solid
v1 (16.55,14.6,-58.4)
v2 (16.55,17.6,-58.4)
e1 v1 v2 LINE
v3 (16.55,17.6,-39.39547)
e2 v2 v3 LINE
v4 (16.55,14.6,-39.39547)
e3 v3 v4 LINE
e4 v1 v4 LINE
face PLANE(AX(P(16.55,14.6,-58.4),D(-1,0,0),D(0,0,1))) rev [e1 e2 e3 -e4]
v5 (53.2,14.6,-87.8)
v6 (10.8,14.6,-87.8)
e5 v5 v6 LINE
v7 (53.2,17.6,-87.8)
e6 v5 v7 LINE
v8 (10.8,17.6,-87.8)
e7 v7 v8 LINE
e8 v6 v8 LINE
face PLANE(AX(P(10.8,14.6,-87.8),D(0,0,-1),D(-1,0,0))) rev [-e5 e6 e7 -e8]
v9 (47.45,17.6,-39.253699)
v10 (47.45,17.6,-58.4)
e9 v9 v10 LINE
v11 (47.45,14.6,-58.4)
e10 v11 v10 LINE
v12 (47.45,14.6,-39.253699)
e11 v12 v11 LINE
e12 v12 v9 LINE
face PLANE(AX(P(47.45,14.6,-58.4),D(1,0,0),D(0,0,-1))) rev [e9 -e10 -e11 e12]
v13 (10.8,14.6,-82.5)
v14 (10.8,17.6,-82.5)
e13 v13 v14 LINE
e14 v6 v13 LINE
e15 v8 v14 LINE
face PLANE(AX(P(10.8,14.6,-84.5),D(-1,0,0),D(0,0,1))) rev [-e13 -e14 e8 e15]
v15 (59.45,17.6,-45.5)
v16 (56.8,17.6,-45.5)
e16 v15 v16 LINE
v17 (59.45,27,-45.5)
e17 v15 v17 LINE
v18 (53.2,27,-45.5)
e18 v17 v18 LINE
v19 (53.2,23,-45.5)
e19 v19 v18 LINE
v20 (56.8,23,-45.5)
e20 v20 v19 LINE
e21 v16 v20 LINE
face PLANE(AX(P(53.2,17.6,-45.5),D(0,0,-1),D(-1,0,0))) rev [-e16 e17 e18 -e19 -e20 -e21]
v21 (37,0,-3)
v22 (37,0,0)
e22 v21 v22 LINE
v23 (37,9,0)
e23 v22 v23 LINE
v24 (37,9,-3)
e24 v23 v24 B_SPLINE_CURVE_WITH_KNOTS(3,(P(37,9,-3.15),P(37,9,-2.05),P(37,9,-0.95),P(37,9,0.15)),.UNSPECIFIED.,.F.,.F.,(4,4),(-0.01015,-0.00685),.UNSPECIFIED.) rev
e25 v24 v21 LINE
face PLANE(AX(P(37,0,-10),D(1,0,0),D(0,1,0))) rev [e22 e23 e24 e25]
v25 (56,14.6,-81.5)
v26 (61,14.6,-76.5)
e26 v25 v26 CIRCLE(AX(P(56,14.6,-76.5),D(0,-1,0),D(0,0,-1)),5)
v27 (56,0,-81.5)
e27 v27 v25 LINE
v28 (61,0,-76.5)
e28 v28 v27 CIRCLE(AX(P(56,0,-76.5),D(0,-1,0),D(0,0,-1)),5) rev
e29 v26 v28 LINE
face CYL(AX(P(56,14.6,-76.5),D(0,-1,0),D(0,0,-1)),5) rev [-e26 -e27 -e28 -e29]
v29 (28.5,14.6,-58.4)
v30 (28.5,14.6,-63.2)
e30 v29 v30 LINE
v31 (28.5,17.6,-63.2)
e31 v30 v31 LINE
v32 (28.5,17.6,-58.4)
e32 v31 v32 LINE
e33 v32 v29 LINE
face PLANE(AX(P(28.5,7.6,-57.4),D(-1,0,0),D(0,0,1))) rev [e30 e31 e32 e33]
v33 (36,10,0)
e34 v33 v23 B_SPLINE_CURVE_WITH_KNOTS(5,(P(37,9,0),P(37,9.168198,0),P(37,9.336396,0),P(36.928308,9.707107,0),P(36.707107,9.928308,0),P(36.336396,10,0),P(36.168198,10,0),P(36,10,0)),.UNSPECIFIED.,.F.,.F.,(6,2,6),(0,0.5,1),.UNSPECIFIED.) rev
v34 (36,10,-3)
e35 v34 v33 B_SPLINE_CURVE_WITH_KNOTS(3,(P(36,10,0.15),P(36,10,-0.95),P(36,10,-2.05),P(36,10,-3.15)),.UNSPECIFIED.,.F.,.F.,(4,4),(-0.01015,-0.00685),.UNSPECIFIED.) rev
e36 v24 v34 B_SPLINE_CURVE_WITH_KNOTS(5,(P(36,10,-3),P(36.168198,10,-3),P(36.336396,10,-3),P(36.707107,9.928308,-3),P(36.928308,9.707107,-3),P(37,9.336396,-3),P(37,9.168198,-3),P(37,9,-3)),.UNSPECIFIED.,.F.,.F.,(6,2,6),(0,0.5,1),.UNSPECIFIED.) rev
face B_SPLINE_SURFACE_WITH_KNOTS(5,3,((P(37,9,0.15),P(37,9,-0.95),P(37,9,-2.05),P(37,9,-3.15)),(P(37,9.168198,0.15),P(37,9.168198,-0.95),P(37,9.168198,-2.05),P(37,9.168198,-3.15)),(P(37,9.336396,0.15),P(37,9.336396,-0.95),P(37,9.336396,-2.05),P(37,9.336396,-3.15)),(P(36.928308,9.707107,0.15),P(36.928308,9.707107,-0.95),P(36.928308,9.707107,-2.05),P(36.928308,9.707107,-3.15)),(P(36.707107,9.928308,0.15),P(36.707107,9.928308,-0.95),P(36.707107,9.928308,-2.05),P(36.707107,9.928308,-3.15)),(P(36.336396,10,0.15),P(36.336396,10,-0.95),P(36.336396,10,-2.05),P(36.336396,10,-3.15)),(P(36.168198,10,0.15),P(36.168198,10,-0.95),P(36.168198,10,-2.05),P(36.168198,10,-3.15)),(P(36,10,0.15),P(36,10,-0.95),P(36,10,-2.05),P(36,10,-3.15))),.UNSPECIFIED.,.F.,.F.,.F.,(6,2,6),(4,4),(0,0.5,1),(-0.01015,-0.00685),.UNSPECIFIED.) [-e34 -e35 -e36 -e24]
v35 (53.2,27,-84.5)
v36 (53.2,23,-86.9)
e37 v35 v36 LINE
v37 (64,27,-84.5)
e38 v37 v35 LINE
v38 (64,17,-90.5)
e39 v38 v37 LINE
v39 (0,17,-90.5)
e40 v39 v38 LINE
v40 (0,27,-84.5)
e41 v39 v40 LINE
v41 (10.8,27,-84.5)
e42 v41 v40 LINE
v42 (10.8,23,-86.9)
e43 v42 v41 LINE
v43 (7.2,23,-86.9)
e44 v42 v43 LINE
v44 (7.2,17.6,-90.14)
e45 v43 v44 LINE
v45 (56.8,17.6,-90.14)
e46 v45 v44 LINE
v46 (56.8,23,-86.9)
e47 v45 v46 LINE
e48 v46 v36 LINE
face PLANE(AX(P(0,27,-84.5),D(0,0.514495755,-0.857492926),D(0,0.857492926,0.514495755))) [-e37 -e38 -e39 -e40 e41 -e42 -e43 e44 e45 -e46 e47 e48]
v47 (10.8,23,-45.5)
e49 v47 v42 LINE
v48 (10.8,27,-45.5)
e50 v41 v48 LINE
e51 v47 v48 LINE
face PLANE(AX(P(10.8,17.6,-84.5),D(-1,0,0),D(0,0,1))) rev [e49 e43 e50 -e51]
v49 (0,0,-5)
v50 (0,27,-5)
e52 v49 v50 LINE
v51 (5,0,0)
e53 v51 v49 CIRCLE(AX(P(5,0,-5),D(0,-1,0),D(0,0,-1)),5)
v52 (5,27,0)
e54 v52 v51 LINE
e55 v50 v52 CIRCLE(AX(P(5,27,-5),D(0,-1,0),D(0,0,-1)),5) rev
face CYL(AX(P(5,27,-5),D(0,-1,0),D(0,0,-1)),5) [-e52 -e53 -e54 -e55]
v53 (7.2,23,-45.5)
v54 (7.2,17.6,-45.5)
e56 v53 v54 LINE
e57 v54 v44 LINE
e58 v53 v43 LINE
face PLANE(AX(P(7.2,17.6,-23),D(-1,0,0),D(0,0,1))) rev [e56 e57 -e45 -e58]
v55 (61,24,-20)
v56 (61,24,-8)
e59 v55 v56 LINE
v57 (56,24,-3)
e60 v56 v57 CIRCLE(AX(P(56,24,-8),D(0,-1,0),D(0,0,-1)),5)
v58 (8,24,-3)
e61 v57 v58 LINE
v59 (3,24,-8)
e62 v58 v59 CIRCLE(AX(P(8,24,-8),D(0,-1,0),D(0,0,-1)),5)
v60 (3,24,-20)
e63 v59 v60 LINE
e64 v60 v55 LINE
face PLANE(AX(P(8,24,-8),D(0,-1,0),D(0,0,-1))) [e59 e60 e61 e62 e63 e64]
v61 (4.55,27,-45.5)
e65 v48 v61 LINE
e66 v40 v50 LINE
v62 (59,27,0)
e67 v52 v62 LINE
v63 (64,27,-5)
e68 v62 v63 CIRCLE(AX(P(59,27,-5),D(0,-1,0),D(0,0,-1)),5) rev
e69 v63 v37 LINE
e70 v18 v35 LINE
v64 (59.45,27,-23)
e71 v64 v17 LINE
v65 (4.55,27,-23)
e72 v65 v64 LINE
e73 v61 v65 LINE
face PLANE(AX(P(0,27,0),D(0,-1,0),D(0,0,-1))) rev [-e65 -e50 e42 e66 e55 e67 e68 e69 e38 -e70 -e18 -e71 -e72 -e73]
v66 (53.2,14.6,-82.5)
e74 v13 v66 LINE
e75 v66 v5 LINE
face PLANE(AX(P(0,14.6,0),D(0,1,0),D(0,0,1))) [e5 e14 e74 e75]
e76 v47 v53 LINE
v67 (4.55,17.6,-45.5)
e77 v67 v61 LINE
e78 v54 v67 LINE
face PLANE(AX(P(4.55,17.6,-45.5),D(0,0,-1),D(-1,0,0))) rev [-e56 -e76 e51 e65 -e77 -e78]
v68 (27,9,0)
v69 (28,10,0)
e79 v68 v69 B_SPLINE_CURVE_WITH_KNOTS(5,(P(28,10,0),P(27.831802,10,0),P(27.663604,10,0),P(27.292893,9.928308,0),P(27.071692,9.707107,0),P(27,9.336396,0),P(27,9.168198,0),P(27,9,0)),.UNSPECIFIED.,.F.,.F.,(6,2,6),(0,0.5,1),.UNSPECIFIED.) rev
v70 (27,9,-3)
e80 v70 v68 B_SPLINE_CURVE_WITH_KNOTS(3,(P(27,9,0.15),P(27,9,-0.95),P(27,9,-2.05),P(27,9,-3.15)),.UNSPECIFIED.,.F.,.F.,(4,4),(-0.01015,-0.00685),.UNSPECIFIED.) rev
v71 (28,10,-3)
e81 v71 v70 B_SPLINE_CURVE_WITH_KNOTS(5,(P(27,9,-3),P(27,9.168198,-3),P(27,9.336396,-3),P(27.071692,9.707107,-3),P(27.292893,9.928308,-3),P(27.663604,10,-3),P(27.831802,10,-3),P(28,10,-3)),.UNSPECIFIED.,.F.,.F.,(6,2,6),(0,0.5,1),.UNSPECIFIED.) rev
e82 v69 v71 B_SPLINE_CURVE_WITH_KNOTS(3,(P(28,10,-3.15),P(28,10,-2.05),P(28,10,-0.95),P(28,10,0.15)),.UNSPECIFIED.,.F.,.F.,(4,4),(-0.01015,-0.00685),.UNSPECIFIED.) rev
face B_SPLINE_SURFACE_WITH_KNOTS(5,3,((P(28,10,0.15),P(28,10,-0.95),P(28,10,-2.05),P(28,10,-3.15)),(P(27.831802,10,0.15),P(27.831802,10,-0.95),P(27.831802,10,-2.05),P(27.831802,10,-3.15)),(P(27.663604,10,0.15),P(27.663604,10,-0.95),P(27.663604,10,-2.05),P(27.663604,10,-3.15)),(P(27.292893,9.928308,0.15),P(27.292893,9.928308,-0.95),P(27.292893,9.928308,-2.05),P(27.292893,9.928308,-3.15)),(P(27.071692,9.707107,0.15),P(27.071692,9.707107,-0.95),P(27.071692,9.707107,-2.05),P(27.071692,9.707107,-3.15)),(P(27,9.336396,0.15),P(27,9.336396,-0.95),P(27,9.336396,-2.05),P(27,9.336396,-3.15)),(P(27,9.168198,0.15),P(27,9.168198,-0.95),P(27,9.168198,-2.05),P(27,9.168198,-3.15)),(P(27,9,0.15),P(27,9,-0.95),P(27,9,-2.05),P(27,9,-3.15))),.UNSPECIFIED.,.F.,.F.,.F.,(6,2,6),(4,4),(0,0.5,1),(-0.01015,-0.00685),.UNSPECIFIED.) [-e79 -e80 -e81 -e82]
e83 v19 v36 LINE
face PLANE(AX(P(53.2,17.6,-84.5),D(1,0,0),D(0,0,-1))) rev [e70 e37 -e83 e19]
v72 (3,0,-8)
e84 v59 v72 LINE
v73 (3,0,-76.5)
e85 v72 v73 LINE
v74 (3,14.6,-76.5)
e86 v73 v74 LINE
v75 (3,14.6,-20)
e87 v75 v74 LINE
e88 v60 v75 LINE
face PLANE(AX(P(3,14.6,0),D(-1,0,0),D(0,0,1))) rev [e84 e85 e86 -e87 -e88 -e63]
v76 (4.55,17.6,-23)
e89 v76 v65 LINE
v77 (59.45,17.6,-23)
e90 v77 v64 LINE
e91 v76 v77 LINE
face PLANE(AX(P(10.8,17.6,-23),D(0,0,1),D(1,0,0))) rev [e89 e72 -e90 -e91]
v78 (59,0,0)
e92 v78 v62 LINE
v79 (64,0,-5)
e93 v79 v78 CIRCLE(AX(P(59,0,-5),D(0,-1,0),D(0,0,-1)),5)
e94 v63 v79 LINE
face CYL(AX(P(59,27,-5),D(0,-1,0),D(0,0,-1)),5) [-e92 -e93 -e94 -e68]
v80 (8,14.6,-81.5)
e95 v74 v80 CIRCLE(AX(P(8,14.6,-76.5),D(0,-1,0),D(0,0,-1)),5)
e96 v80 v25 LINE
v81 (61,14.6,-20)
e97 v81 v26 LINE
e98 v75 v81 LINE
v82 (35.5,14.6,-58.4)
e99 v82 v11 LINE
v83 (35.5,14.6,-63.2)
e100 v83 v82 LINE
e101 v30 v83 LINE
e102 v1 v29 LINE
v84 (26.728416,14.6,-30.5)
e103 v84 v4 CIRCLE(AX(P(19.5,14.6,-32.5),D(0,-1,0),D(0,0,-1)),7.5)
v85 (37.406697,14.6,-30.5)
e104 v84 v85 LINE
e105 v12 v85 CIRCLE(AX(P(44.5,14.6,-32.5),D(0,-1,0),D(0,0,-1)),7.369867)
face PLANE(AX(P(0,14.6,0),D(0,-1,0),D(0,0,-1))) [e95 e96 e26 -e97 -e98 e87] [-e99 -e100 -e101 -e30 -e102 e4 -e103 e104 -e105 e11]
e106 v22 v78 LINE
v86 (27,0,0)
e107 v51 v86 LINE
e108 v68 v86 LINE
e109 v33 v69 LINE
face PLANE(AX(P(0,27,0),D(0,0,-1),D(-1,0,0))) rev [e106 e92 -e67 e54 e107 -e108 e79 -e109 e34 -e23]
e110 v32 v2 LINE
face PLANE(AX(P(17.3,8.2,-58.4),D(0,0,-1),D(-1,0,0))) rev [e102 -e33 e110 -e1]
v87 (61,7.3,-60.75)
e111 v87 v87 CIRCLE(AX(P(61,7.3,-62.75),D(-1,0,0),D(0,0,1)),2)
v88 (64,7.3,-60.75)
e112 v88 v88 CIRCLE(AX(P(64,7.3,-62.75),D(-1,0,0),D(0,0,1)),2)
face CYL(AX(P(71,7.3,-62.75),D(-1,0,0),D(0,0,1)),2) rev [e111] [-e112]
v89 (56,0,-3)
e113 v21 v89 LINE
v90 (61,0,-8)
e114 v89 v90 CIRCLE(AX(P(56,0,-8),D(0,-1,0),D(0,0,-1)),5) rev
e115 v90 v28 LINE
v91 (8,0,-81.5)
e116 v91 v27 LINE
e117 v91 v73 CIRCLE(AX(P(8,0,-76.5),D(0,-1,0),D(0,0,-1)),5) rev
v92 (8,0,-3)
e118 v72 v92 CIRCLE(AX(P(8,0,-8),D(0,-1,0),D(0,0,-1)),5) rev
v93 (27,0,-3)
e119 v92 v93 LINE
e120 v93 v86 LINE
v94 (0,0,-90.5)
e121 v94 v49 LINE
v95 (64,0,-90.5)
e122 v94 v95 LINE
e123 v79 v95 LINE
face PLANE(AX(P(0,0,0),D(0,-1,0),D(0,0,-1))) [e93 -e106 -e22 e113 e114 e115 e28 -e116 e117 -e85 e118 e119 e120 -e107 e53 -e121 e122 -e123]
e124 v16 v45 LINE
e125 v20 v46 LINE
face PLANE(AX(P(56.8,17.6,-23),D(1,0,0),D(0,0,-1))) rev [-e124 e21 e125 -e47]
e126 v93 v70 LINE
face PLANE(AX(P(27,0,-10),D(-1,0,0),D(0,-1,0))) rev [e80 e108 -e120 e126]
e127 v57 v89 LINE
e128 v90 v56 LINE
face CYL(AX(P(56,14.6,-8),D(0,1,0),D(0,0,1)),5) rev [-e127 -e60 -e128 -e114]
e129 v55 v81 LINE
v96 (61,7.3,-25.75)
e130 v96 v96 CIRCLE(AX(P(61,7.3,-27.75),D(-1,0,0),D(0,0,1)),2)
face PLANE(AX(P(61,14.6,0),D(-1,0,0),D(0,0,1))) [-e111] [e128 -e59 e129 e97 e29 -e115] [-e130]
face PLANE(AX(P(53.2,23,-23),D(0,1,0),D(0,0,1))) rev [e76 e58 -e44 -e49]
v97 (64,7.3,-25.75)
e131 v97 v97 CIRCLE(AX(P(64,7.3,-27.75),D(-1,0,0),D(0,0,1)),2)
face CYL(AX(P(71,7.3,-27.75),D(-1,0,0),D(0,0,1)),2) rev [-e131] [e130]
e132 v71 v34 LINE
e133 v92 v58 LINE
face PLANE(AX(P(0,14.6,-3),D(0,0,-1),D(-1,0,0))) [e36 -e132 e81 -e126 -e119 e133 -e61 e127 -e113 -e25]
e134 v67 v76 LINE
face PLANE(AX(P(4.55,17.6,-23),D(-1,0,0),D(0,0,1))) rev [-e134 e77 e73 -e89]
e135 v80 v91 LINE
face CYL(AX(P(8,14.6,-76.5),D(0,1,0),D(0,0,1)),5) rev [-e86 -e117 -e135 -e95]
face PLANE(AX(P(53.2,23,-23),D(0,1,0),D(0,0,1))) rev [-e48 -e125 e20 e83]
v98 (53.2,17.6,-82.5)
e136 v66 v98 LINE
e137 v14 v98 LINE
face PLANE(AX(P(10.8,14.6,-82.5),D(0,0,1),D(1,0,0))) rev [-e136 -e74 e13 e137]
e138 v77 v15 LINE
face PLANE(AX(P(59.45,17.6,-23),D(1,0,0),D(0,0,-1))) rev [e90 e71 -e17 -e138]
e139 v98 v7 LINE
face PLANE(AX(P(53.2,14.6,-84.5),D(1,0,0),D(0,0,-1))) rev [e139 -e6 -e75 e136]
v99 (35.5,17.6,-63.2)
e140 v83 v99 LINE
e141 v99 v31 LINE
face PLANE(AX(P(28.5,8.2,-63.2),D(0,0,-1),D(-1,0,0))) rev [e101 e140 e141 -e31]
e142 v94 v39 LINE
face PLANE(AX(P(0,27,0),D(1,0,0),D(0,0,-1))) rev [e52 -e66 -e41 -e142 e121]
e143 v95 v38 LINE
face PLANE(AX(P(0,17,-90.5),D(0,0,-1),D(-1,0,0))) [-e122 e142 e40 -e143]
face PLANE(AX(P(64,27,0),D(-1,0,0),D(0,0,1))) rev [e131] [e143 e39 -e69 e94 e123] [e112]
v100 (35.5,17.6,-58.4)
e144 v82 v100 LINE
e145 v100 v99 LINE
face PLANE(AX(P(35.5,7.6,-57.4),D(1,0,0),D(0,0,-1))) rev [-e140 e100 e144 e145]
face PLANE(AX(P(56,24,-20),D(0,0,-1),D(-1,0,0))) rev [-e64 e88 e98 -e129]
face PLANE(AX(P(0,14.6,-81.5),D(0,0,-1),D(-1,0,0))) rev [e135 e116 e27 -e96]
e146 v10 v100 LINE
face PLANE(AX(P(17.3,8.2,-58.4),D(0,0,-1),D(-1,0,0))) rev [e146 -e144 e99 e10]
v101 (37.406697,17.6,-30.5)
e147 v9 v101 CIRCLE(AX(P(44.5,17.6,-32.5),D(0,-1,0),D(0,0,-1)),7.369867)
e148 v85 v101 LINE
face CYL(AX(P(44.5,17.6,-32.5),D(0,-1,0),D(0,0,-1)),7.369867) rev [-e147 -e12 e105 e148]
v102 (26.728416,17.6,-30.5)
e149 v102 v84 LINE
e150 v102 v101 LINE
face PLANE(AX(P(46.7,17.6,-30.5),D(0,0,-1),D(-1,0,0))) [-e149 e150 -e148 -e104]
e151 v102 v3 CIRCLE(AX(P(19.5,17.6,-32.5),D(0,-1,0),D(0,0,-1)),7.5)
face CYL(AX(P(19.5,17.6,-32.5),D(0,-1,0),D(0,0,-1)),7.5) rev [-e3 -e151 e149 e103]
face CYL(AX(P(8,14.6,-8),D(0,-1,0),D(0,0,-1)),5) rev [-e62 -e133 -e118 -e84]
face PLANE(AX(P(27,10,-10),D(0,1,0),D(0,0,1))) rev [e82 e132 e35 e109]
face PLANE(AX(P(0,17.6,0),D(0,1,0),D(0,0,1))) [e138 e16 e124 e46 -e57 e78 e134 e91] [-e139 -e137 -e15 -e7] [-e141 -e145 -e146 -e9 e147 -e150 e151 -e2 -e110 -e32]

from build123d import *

# Parameters (mm, degrees)
SKETCH1_W           = 64
SKETCH1_H           = 84.5
BOSS_EXTRUDE1_DEPTH = 27
FILLET1_R           = 5
SKETCH2_W           = 42.4
SKETCH2_H           = 61.5
CUT_EXTRUDE1_DEPTH  = 9.4
SKETCH3_W           = 3.6
SKETCH3_H           = 5.4
CUT_EXTRUDE2_DEPTH  = 61.5
SKETCH4_W           = 7
SKETCH4_H           = 4.8
CUT_EXTRUDE3_DEPTH  = 61.5
SKETCH5_W           = 58
SKETCH5_H           = 78.5
CUT_EXTRUDE4_DEPTH  = 14.6
FILLET2_R           = 5
CUT_EXTRUDE5_START  = -9.4
CUT_EXTRUDE5_DEPTH  = 9.4
SKETCH7_W           = 10
SKETCH7_H           = 10
CUT_EXTRUDE6_DEPTH  = 10
FILLET3_SIZE        = 1
SKETCH8_W           = 6.25
SKETCH8_H           = 13.5
CUT_EXTRUDE8_DEPTH  = 9.4
CUT_EXTRUDE9_DEPTH  = 10
SKETCH10_W          = 6.25
SKETCH10_H          = 9
CUT_EXTRUDE10_DEPTH = 9.4
SKETCH11_W          = 7
SKETCH11_H          = 1
SKETCH11_W_2        = 29.4
CUT_EXTRUDE11_DEPTH = 9.4
SKETCH12_W          = 29.4
SKETCH12_H          = 7.5
BOSS_EXTRUDE2_DEPTH = 3
SKETCH13_W          = 0.75
SKETCH13_H          = 27.9
CUT_EXTRUDE12_DEPTH = 3
SKETCH15_R          = 7.369867451
SKETCH15_R_2        = 7.5
CUT_EXTRUDE13_DEPTH = 3
BOSS_EXTRUDE3_DEPTH = 64
BOSS_EXTRUDE4_DEPTH = 27
SKETCH18_W          = 49.6
SKETCH18_H          = 7.565133063
CUT_EXTRUDE16_DEPTH = 5.4
SKETCH19_W          = 42.4
SKETCH19_H          = 4
CUT_EXTRUDE17_DEPTH = 5.4
CUT_EXTRUDE18_DEPTH = 3
SKETCH21_R          = 2
CUT_EXTRUDE19_DEPTH = 10


with BuildPart() as part:
    # Sketch1 → Boss-Extrude1 (new body)
    with BuildSketch(Plane(origin=(0, 0, 0), x_dir=(1, 0, 0), z_dir=(0, 1, 0))):
        with Locations((32, 42.25)):
            Rectangle(SKETCH1_W, SKETCH1_H)
    extrude(amount=BOSS_EXTRUDE1_DEPTH)

    # Fillet1
    fillet1_edges = [part.edges().sort_by_distance(p)[0] for p in [
        (0, 13.5, -84.5),
        (64, 13.5, -84.5),
        (64, 13.5, 0),
        (0, 13.5, 0),
    ]]
    fillet(fillet1_edges, radius=FILLET1_R)

    # Sketch2 → Cut-Extrude1 (cut)
    with BuildSketch(Plane(origin=(0, 27, 0), x_dir=(1, 0, 0), z_dir=(0, 1, 0))):
        with Locations((32, 53.75)):
            Rectangle(SKETCH2_W, SKETCH2_H)
    extrude(amount=-CUT_EXTRUDE1_DEPTH, mode=Mode.SUBTRACT)

    # Sketch3 → Cut-Extrude2 (cut)
    with BuildSketch(Plane(origin=(0, 0, -84.5), x_dir=(-1, 0, 0), z_dir=(0, 0, -1))):
        with Locations((-55, 20.3)):
            Rectangle(SKETCH3_W, SKETCH3_H)
        with Locations((-9, 20.3)):
            Rectangle(SKETCH3_W, SKETCH3_H)
    extrude(amount=-CUT_EXTRUDE2_DEPTH, mode=Mode.SUBTRACT)

    # Sketch4 → Cut-Extrude3 (cut)
    with BuildSketch(Plane(origin=(0, 17.6, 0), x_dir=(1, 0, 0), z_dir=(0, 1, 0))):
        Polygon((17.3, 23), (46.7, 23), (46.7, 49.4), (35.5, 49.4), (28.5, 49.4), (17.3, 49.4), align=None)
        with Locations((32, 51.8)):
            Rectangle(SKETCH4_W, SKETCH4_H)
    extrude(amount=-CUT_EXTRUDE3_DEPTH, mode=Mode.SUBTRACT)

    # Sketch5 → Cut-Extrude4 (cut)
    with BuildSketch(Plane.XZ):
        with Locations((32, -42.25)):
            Rectangle(SKETCH5_W, SKETCH5_H)
        Polygon((28.5, -54.2), (28.5, -49.4), (17.3, -49.4), (17.3, -23), (46.7, -23), (46.7, -49.4), (35.5, -49.4), (35.5, -54.2), align=None, mode=Mode.SUBTRACT)
    extrude(amount=-CUT_EXTRUDE4_DEPTH, mode=Mode.SUBTRACT)

    # Fillet2
    fillet2_edges = [part.edges().sort_by_distance(p)[0] for p in [
        (61, 7.3, -3),
        (61, 7.3, -81.5),
        (3, 7.3, -81.5),
        (3, 7.3, -3),
    ]]
    fillet(fillet2_edges, radius=FILLET2_R)

    # Sketch6 → Cut-Extrude5 (cut)
    with BuildSketch(Plane.XZ.offset(-14.6).offset(CUT_EXTRUDE5_START)):
        with BuildLine():
            Line((8, -3), (56, -3))
            ThreePointArc((56, -3), (59.535533906, -4.464466094), (61, -8))
            Line((61, -8), (61, -20))
            Line((61, -20), (56, -20))
            Line((56, -20), (8, -20))
            Line((8, -20), (3, -20))
            Line((3, -20), (3, -8))
            ThreePointArc((3, -8), (4.464466094, -4.464466094), (8, -3))
        make_face()
    extrude(amount=CUT_EXTRUDE5_DEPTH, mode=Mode.SUBTRACT)

    # Sketch7 → Cut-Extrude6 (cut)
    with BuildSketch(Plane.XY):
        with Locations((32, 5)):
            Rectangle(SKETCH7_W, SKETCH7_H)
    extrude(amount=-CUT_EXTRUDE6_DEPTH, mode=Mode.SUBTRACT)

    # Fillet3
    # a fillet whose section is not a circle: 1 mm, written as the material it adds along each edge
    with BuildSketch(Plane(origin=(37, 10, 0), x_dir=(0, -1, 0), z_dir=(0, 0, -1))) as fillet3_piece_1:
        with BuildLine():
            add(Edge.make_bspline([(FILLET3_SIZE, 0), (FILLET3_SIZE * 0.831801948466, 0), (FILLET3_SIZE * 0.663603896932, 0), (FILLET3_SIZE * 0.292893218813, FILLET3_SIZE * 0.0716919198361), (FILLET3_SIZE * 0.0716919198361, FILLET3_SIZE * 0.292893218813), (0, FILLET3_SIZE * 0.663603896932), (0, FILLET3_SIZE * 0.831801948466), (0, FILLET3_SIZE)], knots=[0, 0, 0, 0, 0, 0, 0.5, 0.5, 1, 1, 1, 1, 1, 1], degree=5))
            Line((0, FILLET3_SIZE), (0, 0))
            Line((0, 0), (FILLET3_SIZE, 0))
        make_face()
    extrude(amount=3)
    with BuildSketch(Plane(origin=(27, 10, 0), x_dir=(0, -1, 0), z_dir=(0, 0, -1))) as fillet3_piece_2:
        with BuildLine():
            add(Edge.make_bspline([(FILLET3_SIZE, 0), (FILLET3_SIZE * 0.831801948466, 0), (FILLET3_SIZE * 0.663603896932, 0), (FILLET3_SIZE * 0.292893218813, -FILLET3_SIZE * 0.0716919198361), (FILLET3_SIZE * 0.0716919198361, -FILLET3_SIZE * 0.292893218813), (0, -FILLET3_SIZE * 0.663603896932), (0, -FILLET3_SIZE * 0.831801948466), (0, -FILLET3_SIZE)], knots=[0, 0, 0, 0, 0, 0, 0.5, 0.5, 1, 1, 1, 1, 1, 1], degree=5))
            Line((0, -FILLET3_SIZE), (0, 0))
            Line((0, 0), (FILLET3_SIZE, 0))
        make_face()
    extrude(amount=3)

    # Sketch8 → Cut-Extrude8 (cut)
    with BuildSketch(Plane(origin=(0, 27, 0), x_dir=(1, 0, 0), z_dir=(0, 1, 0))):
        with Locations((7.675, 29.75)):
            Rectangle(SKETCH8_W, SKETCH8_H)
        with Locations((56.325, 29.75)):
            Rectangle(SKETCH8_W, SKETCH8_H)
    extrude(amount=-CUT_EXTRUDE8_DEPTH, mode=Mode.SUBTRACT)

    # Sketch9 → Cut-Extrude9 (cut)
    with BuildSketch(Plane(origin=(0, 17.6, 0), x_dir=(1, 0, 0), z_dir=(0, 1, 0))):
        Polygon((17.3, 49.4), (17.3, 57.4), (28.5, 57.4), (28.5, 62.2), (35.5, 62.2), (35.5, 57.4), (46.7, 57.4), (46.7, 49.4), align=None)
    extrude(amount=-CUT_EXTRUDE9_DEPTH, mode=Mode.SUBTRACT)

    # Sketch10 → Cut-Extrude10 (cut)
    with BuildSketch(Plane(origin=(0, 27, 0), x_dir=(1, 0, 0), z_dir=(0, 1, 0))):
        with Locations((7.675, 41)):
            Rectangle(SKETCH10_W, SKETCH10_H)
        with Locations((56.325, 41)):
            Rectangle(SKETCH10_W, SKETCH10_H)
    extrude(amount=-CUT_EXTRUDE10_DEPTH, mode=Mode.SUBTRACT)

    # Sketch11 → Cut-Extrude11 (cut)
    with BuildSketch(Plane(origin=(0, 17.6, 0), x_dir=(1, 0, 0), z_dir=(0, 1, 0))):
        with Locations((32, 62.7)):
            Rectangle(SKETCH11_W, SKETCH11_H)
        with Locations((32, 57.9)):
            Rectangle(SKETCH11_W_2, SKETCH11_H)
    extrude(amount=-CUT_EXTRUDE11_DEPTH, mode=Mode.SUBTRACT)

    # Sketch12 → Boss-Extrude2 (add)
    with BuildSketch(Plane.XZ.offset(-14.6)):
        with Locations((32, -26.75)):
            Rectangle(SKETCH12_W, SKETCH12_H)
    extrude(amount=-BOSS_EXTRUDE2_DEPTH)

    # Sketch13 → Cut-Extrude12 (cut)
    with BuildSketch(Plane(origin=(0, 17.6, 0), x_dir=(1, 0, 0), z_dir=(0, 1, 0))):
        with Locations((16.925, 44.45)):
            Rectangle(SKETCH13_W, SKETCH13_H)
        with Locations((47.075, 44.45)):
            Rectangle(SKETCH13_W, SKETCH13_H)
    extrude(amount=-CUT_EXTRUDE12_DEPTH, mode=Mode.SUBTRACT)

    # Sketch15 → Cut-Extrude13 (cut)
    with BuildSketch(Plane.XZ.offset(-14.6)):
        with Locations((44.5, -32.5)):
            Circle(SKETCH15_R)
        with Locations((19.5, -32.5)):
            Circle(SKETCH15_R_2)
    extrude(amount=-CUT_EXTRUDE13_DEPTH, mode=Mode.SUBTRACT)

    # Sketch16 → Boss-Extrude3 (add)
    with BuildSketch(Plane(origin=(64, 0, 0), x_dir=(0, 0, -1), z_dir=(1, 0, 0))):
        Polygon((84.5, 27), (84.5, 17), (84.5, 0), (90.5, 0), (90.5, 17), align=None)
    extrude(amount=-BOSS_EXTRUDE3_DEPTH)

    # Sketch17 → Boss-Extrude4 (add)
    with BuildSketch(Plane(origin=(0, 27, 0), x_dir=(1, 0, 0), z_dir=(0, 1, 0))):
        Polygon((64, 84.5), (64, 79.5), (59, 84.5), align=None)
        Polygon((0, 79.5), (5, 84.5), (0, 84.5), align=None)
    extrude(amount=-BOSS_EXTRUDE4_DEPTH)

    # Sketch18 → Cut-Extrude16 (cut)
    with BuildSketch(Plane(origin=(0, 17.6, 0), x_dir=(1, 0, 0), z_dir=(0, 1, 0))):
        with Locations((32, 88.282566532)):
            Rectangle(SKETCH18_W, SKETCH18_H)
    extrude(amount=CUT_EXTRUDE16_DEPTH, mode=Mode.SUBTRACT)

    # Sketch19 → Cut-Extrude17 (cut)
    with BuildSketch(Plane.XY.offset(-84.5)):
        with Locations((32, 25)):
            Rectangle(SKETCH19_W, SKETCH19_H)
    extrude(amount=-CUT_EXTRUDE17_DEPTH, mode=Mode.SUBTRACT)

    # Sketch20 → Cut-Extrude18 (cut)
    with BuildSketch(Plane(origin=(0, 17.6, 0), x_dir=(1, 0, 0), z_dir=(0, 1, 0))):
        Polygon((10.8, 84.5), (10.8, 87.8), (53.2, 87.8), (53.2, 84.5), (53.2, 82.5), (10.8, 82.5), align=None)
    extrude(amount=-CUT_EXTRUDE18_DEPTH, mode=Mode.SUBTRACT)

    # Sketch21 → Cut-Extrude19 (cut)
    with BuildSketch(Plane.ZY.offset(-61)):
        with Locations((-62.75, 7.3)):
            Circle(SKETCH21_R)
        with Locations((-27.75, 7.3)):
            Circle(SKETCH21_R)
    extrude(amount=-CUT_EXTRUDE19_DEPTH, mode=Mode.SUBTRACT)


solid = part.part
